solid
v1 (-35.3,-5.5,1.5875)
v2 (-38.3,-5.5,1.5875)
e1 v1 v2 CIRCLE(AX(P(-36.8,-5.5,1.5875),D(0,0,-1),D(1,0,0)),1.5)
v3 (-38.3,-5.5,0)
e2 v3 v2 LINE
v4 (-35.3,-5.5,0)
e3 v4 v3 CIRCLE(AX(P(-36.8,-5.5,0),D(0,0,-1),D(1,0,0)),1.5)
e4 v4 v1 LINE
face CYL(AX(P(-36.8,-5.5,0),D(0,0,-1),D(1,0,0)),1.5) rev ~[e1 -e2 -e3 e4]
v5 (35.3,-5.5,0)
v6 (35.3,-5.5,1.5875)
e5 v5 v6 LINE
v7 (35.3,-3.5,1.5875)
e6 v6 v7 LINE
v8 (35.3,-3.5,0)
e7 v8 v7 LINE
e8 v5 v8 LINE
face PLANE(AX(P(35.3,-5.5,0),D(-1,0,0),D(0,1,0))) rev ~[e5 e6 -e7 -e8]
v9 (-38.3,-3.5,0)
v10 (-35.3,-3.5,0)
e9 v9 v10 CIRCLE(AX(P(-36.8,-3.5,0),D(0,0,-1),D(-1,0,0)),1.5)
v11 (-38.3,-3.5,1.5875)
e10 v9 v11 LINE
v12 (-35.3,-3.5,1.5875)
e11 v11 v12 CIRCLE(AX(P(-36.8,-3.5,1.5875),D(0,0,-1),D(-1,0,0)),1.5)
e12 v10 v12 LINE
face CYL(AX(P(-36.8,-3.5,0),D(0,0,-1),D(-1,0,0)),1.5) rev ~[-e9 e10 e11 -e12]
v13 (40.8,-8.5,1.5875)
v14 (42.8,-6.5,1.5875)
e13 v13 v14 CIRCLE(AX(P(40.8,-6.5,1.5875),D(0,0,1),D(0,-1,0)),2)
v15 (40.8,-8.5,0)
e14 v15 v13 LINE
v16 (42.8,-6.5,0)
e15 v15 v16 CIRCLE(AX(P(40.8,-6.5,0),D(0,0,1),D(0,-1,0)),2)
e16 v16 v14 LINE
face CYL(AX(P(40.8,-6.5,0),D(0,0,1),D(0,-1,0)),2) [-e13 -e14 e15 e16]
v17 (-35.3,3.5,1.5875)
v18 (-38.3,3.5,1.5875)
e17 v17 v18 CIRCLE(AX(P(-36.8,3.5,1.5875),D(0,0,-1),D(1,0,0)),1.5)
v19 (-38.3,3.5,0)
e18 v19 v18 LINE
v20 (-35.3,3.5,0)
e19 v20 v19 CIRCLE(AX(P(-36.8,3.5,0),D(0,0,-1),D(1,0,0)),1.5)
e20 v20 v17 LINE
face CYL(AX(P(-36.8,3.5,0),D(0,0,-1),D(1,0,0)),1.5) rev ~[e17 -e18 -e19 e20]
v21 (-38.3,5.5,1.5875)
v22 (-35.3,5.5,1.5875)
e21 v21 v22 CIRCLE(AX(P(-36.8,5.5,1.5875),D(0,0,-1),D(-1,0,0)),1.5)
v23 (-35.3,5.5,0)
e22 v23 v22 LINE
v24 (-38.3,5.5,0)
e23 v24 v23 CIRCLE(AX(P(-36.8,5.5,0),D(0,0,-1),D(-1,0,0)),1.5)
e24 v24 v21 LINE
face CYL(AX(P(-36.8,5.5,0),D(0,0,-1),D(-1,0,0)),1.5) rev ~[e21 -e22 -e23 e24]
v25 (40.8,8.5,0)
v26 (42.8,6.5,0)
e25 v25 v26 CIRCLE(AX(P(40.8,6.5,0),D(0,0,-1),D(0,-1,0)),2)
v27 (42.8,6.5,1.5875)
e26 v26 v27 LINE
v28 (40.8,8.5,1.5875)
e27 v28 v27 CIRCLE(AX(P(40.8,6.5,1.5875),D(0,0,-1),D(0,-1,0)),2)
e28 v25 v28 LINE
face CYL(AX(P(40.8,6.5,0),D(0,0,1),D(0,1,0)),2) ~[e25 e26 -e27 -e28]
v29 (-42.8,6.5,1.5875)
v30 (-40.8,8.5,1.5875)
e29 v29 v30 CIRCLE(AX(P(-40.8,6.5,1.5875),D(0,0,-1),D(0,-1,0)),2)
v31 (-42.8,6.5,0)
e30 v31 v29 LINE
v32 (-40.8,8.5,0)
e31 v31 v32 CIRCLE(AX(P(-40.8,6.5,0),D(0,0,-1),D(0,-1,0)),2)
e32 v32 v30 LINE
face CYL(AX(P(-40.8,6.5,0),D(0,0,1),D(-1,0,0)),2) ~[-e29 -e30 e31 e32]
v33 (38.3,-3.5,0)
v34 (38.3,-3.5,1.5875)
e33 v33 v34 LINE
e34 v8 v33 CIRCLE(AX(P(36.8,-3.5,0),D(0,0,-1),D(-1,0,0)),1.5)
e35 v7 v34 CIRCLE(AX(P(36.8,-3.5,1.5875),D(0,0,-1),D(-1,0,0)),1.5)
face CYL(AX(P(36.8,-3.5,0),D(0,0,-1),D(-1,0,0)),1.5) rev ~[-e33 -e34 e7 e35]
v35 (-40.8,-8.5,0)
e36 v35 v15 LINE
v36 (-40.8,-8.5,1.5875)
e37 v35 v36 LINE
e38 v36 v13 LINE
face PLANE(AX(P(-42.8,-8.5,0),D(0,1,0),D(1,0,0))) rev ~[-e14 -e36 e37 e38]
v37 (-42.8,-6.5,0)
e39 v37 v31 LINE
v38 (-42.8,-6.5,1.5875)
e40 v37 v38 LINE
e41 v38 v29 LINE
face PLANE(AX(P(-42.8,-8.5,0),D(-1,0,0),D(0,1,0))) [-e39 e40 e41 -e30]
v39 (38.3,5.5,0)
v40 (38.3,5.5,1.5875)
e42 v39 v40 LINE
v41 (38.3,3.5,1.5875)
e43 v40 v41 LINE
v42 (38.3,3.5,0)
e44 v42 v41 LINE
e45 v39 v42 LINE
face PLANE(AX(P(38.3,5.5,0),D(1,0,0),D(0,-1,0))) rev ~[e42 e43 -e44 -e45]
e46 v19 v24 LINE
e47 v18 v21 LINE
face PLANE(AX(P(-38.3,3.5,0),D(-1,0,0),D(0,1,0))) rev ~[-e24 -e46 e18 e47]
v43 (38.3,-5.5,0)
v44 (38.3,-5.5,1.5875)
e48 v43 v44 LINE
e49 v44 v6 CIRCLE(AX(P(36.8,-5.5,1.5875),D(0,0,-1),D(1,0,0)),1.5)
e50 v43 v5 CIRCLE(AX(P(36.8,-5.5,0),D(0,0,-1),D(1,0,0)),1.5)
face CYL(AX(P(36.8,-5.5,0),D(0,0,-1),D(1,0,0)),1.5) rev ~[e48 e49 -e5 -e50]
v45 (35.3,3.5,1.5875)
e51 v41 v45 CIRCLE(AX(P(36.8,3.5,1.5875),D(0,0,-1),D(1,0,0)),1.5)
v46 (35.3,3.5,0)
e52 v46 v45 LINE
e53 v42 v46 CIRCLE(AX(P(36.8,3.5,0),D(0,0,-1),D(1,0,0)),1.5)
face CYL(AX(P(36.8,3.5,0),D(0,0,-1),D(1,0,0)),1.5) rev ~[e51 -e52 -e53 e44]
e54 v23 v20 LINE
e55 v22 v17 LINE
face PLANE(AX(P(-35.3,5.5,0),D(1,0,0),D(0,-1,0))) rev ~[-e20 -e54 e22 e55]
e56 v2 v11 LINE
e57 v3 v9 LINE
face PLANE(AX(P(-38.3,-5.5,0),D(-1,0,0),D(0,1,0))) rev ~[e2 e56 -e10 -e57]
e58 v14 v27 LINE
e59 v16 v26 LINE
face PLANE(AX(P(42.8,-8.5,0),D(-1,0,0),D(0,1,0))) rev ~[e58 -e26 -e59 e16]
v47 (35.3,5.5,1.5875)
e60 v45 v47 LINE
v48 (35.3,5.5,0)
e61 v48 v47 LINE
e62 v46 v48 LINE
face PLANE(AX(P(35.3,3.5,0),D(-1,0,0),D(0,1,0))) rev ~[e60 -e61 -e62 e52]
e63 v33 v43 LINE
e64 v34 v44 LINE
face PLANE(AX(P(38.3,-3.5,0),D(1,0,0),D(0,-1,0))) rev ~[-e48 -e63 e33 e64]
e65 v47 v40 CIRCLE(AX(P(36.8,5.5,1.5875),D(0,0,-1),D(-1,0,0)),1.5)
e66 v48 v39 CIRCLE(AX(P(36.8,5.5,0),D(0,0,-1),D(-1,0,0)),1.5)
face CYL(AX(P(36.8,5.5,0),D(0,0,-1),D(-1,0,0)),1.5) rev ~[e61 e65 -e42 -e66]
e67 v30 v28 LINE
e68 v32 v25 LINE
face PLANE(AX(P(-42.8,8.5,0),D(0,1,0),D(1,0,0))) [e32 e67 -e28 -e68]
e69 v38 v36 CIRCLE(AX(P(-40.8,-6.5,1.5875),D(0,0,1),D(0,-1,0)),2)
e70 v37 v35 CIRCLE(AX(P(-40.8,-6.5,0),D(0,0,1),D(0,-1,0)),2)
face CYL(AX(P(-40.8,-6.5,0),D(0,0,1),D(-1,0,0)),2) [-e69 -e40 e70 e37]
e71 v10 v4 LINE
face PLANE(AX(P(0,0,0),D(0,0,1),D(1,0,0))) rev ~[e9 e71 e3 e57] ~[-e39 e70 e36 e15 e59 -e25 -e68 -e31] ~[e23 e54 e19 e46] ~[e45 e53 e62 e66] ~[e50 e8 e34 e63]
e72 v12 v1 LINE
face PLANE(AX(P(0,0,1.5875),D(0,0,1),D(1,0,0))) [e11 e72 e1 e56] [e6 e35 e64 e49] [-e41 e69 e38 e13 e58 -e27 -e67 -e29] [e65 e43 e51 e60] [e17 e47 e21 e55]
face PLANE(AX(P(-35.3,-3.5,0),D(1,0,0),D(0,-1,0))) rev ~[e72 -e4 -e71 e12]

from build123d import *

# Parameters (mm, degrees)
F0_W     = 85.6
F0_H     = 17
F1_DEPTH = 1.5875
F2_R     = 2


# Not quite as in the source:
# - a length typed as a fraction of an inch, garbled in the dataset ("3 / 203.2 mm" for 3/8 in), is restored


with BuildPart() as f1:
    # F0 (on Top) → F1 (new body)
    with BuildSketch(Plane.XY):
        Rectangle(F0_W, F0_H)
        with BuildLine():
            ThreePointArc((-35.3, -5.5), (-36.8, -7), (-38.3, -5.5))
            Line((-38.3, -5.5), (-38.3, -3.5))
            ThreePointArc((-38.3, -3.5), (-36.8, -2), (-35.3, -3.5))
            Line((-35.3, -3.5), (-35.3, -5.5))
        make_face(mode=Mode.SUBTRACT)
        with BuildLine():
            ThreePointArc((35.3, -3.5), (36.8, -2), (38.3, -3.5))
            Line((38.3, -3.5), (38.3, -5.5))
            ThreePointArc((38.3, -5.5), (36.8, -7), (35.3, -5.5))
            Line((35.3, -5.5), (35.3, -3.5))
        make_face(mode=Mode.SUBTRACT)
        with BuildLine():
            ThreePointArc((-38.3, 5.5), (-36.8, 7), (-35.3, 5.5))
            Line((-35.3, 5.5), (-35.3, 3.5))
            ThreePointArc((-35.3, 3.5), (-36.8, 2), (-38.3, 3.5))
            Line((-38.3, 3.5), (-38.3, 5.5))
        make_face(mode=Mode.SUBTRACT)
        with BuildLine():
            Line((35.3, 3.5), (35.3, 5.5))
            ThreePointArc((35.3, 5.5), (36.8, 7), (38.3, 5.5))
            Line((38.3, 5.5), (38.3, 3.5))
            ThreePointArc((38.3, 3.5), (36.8, 2), (35.3, 3.5))
        make_face(mode=Mode.SUBTRACT)
    extrude(amount=F1_DEPTH)

    # F2
    f2_edges = [f1.edges().sort_by_distance(p)[0] for p in [
        (-42.8, -8.5, 0.79375),
        (-42.8, 8.5, 0.79375),
        (42.8, 8.5, 0.79375),
        (42.8, -8.5, 0.79375),
    ]]
    fillet(f2_edges, radius=F2_R)


solid = f1.part
